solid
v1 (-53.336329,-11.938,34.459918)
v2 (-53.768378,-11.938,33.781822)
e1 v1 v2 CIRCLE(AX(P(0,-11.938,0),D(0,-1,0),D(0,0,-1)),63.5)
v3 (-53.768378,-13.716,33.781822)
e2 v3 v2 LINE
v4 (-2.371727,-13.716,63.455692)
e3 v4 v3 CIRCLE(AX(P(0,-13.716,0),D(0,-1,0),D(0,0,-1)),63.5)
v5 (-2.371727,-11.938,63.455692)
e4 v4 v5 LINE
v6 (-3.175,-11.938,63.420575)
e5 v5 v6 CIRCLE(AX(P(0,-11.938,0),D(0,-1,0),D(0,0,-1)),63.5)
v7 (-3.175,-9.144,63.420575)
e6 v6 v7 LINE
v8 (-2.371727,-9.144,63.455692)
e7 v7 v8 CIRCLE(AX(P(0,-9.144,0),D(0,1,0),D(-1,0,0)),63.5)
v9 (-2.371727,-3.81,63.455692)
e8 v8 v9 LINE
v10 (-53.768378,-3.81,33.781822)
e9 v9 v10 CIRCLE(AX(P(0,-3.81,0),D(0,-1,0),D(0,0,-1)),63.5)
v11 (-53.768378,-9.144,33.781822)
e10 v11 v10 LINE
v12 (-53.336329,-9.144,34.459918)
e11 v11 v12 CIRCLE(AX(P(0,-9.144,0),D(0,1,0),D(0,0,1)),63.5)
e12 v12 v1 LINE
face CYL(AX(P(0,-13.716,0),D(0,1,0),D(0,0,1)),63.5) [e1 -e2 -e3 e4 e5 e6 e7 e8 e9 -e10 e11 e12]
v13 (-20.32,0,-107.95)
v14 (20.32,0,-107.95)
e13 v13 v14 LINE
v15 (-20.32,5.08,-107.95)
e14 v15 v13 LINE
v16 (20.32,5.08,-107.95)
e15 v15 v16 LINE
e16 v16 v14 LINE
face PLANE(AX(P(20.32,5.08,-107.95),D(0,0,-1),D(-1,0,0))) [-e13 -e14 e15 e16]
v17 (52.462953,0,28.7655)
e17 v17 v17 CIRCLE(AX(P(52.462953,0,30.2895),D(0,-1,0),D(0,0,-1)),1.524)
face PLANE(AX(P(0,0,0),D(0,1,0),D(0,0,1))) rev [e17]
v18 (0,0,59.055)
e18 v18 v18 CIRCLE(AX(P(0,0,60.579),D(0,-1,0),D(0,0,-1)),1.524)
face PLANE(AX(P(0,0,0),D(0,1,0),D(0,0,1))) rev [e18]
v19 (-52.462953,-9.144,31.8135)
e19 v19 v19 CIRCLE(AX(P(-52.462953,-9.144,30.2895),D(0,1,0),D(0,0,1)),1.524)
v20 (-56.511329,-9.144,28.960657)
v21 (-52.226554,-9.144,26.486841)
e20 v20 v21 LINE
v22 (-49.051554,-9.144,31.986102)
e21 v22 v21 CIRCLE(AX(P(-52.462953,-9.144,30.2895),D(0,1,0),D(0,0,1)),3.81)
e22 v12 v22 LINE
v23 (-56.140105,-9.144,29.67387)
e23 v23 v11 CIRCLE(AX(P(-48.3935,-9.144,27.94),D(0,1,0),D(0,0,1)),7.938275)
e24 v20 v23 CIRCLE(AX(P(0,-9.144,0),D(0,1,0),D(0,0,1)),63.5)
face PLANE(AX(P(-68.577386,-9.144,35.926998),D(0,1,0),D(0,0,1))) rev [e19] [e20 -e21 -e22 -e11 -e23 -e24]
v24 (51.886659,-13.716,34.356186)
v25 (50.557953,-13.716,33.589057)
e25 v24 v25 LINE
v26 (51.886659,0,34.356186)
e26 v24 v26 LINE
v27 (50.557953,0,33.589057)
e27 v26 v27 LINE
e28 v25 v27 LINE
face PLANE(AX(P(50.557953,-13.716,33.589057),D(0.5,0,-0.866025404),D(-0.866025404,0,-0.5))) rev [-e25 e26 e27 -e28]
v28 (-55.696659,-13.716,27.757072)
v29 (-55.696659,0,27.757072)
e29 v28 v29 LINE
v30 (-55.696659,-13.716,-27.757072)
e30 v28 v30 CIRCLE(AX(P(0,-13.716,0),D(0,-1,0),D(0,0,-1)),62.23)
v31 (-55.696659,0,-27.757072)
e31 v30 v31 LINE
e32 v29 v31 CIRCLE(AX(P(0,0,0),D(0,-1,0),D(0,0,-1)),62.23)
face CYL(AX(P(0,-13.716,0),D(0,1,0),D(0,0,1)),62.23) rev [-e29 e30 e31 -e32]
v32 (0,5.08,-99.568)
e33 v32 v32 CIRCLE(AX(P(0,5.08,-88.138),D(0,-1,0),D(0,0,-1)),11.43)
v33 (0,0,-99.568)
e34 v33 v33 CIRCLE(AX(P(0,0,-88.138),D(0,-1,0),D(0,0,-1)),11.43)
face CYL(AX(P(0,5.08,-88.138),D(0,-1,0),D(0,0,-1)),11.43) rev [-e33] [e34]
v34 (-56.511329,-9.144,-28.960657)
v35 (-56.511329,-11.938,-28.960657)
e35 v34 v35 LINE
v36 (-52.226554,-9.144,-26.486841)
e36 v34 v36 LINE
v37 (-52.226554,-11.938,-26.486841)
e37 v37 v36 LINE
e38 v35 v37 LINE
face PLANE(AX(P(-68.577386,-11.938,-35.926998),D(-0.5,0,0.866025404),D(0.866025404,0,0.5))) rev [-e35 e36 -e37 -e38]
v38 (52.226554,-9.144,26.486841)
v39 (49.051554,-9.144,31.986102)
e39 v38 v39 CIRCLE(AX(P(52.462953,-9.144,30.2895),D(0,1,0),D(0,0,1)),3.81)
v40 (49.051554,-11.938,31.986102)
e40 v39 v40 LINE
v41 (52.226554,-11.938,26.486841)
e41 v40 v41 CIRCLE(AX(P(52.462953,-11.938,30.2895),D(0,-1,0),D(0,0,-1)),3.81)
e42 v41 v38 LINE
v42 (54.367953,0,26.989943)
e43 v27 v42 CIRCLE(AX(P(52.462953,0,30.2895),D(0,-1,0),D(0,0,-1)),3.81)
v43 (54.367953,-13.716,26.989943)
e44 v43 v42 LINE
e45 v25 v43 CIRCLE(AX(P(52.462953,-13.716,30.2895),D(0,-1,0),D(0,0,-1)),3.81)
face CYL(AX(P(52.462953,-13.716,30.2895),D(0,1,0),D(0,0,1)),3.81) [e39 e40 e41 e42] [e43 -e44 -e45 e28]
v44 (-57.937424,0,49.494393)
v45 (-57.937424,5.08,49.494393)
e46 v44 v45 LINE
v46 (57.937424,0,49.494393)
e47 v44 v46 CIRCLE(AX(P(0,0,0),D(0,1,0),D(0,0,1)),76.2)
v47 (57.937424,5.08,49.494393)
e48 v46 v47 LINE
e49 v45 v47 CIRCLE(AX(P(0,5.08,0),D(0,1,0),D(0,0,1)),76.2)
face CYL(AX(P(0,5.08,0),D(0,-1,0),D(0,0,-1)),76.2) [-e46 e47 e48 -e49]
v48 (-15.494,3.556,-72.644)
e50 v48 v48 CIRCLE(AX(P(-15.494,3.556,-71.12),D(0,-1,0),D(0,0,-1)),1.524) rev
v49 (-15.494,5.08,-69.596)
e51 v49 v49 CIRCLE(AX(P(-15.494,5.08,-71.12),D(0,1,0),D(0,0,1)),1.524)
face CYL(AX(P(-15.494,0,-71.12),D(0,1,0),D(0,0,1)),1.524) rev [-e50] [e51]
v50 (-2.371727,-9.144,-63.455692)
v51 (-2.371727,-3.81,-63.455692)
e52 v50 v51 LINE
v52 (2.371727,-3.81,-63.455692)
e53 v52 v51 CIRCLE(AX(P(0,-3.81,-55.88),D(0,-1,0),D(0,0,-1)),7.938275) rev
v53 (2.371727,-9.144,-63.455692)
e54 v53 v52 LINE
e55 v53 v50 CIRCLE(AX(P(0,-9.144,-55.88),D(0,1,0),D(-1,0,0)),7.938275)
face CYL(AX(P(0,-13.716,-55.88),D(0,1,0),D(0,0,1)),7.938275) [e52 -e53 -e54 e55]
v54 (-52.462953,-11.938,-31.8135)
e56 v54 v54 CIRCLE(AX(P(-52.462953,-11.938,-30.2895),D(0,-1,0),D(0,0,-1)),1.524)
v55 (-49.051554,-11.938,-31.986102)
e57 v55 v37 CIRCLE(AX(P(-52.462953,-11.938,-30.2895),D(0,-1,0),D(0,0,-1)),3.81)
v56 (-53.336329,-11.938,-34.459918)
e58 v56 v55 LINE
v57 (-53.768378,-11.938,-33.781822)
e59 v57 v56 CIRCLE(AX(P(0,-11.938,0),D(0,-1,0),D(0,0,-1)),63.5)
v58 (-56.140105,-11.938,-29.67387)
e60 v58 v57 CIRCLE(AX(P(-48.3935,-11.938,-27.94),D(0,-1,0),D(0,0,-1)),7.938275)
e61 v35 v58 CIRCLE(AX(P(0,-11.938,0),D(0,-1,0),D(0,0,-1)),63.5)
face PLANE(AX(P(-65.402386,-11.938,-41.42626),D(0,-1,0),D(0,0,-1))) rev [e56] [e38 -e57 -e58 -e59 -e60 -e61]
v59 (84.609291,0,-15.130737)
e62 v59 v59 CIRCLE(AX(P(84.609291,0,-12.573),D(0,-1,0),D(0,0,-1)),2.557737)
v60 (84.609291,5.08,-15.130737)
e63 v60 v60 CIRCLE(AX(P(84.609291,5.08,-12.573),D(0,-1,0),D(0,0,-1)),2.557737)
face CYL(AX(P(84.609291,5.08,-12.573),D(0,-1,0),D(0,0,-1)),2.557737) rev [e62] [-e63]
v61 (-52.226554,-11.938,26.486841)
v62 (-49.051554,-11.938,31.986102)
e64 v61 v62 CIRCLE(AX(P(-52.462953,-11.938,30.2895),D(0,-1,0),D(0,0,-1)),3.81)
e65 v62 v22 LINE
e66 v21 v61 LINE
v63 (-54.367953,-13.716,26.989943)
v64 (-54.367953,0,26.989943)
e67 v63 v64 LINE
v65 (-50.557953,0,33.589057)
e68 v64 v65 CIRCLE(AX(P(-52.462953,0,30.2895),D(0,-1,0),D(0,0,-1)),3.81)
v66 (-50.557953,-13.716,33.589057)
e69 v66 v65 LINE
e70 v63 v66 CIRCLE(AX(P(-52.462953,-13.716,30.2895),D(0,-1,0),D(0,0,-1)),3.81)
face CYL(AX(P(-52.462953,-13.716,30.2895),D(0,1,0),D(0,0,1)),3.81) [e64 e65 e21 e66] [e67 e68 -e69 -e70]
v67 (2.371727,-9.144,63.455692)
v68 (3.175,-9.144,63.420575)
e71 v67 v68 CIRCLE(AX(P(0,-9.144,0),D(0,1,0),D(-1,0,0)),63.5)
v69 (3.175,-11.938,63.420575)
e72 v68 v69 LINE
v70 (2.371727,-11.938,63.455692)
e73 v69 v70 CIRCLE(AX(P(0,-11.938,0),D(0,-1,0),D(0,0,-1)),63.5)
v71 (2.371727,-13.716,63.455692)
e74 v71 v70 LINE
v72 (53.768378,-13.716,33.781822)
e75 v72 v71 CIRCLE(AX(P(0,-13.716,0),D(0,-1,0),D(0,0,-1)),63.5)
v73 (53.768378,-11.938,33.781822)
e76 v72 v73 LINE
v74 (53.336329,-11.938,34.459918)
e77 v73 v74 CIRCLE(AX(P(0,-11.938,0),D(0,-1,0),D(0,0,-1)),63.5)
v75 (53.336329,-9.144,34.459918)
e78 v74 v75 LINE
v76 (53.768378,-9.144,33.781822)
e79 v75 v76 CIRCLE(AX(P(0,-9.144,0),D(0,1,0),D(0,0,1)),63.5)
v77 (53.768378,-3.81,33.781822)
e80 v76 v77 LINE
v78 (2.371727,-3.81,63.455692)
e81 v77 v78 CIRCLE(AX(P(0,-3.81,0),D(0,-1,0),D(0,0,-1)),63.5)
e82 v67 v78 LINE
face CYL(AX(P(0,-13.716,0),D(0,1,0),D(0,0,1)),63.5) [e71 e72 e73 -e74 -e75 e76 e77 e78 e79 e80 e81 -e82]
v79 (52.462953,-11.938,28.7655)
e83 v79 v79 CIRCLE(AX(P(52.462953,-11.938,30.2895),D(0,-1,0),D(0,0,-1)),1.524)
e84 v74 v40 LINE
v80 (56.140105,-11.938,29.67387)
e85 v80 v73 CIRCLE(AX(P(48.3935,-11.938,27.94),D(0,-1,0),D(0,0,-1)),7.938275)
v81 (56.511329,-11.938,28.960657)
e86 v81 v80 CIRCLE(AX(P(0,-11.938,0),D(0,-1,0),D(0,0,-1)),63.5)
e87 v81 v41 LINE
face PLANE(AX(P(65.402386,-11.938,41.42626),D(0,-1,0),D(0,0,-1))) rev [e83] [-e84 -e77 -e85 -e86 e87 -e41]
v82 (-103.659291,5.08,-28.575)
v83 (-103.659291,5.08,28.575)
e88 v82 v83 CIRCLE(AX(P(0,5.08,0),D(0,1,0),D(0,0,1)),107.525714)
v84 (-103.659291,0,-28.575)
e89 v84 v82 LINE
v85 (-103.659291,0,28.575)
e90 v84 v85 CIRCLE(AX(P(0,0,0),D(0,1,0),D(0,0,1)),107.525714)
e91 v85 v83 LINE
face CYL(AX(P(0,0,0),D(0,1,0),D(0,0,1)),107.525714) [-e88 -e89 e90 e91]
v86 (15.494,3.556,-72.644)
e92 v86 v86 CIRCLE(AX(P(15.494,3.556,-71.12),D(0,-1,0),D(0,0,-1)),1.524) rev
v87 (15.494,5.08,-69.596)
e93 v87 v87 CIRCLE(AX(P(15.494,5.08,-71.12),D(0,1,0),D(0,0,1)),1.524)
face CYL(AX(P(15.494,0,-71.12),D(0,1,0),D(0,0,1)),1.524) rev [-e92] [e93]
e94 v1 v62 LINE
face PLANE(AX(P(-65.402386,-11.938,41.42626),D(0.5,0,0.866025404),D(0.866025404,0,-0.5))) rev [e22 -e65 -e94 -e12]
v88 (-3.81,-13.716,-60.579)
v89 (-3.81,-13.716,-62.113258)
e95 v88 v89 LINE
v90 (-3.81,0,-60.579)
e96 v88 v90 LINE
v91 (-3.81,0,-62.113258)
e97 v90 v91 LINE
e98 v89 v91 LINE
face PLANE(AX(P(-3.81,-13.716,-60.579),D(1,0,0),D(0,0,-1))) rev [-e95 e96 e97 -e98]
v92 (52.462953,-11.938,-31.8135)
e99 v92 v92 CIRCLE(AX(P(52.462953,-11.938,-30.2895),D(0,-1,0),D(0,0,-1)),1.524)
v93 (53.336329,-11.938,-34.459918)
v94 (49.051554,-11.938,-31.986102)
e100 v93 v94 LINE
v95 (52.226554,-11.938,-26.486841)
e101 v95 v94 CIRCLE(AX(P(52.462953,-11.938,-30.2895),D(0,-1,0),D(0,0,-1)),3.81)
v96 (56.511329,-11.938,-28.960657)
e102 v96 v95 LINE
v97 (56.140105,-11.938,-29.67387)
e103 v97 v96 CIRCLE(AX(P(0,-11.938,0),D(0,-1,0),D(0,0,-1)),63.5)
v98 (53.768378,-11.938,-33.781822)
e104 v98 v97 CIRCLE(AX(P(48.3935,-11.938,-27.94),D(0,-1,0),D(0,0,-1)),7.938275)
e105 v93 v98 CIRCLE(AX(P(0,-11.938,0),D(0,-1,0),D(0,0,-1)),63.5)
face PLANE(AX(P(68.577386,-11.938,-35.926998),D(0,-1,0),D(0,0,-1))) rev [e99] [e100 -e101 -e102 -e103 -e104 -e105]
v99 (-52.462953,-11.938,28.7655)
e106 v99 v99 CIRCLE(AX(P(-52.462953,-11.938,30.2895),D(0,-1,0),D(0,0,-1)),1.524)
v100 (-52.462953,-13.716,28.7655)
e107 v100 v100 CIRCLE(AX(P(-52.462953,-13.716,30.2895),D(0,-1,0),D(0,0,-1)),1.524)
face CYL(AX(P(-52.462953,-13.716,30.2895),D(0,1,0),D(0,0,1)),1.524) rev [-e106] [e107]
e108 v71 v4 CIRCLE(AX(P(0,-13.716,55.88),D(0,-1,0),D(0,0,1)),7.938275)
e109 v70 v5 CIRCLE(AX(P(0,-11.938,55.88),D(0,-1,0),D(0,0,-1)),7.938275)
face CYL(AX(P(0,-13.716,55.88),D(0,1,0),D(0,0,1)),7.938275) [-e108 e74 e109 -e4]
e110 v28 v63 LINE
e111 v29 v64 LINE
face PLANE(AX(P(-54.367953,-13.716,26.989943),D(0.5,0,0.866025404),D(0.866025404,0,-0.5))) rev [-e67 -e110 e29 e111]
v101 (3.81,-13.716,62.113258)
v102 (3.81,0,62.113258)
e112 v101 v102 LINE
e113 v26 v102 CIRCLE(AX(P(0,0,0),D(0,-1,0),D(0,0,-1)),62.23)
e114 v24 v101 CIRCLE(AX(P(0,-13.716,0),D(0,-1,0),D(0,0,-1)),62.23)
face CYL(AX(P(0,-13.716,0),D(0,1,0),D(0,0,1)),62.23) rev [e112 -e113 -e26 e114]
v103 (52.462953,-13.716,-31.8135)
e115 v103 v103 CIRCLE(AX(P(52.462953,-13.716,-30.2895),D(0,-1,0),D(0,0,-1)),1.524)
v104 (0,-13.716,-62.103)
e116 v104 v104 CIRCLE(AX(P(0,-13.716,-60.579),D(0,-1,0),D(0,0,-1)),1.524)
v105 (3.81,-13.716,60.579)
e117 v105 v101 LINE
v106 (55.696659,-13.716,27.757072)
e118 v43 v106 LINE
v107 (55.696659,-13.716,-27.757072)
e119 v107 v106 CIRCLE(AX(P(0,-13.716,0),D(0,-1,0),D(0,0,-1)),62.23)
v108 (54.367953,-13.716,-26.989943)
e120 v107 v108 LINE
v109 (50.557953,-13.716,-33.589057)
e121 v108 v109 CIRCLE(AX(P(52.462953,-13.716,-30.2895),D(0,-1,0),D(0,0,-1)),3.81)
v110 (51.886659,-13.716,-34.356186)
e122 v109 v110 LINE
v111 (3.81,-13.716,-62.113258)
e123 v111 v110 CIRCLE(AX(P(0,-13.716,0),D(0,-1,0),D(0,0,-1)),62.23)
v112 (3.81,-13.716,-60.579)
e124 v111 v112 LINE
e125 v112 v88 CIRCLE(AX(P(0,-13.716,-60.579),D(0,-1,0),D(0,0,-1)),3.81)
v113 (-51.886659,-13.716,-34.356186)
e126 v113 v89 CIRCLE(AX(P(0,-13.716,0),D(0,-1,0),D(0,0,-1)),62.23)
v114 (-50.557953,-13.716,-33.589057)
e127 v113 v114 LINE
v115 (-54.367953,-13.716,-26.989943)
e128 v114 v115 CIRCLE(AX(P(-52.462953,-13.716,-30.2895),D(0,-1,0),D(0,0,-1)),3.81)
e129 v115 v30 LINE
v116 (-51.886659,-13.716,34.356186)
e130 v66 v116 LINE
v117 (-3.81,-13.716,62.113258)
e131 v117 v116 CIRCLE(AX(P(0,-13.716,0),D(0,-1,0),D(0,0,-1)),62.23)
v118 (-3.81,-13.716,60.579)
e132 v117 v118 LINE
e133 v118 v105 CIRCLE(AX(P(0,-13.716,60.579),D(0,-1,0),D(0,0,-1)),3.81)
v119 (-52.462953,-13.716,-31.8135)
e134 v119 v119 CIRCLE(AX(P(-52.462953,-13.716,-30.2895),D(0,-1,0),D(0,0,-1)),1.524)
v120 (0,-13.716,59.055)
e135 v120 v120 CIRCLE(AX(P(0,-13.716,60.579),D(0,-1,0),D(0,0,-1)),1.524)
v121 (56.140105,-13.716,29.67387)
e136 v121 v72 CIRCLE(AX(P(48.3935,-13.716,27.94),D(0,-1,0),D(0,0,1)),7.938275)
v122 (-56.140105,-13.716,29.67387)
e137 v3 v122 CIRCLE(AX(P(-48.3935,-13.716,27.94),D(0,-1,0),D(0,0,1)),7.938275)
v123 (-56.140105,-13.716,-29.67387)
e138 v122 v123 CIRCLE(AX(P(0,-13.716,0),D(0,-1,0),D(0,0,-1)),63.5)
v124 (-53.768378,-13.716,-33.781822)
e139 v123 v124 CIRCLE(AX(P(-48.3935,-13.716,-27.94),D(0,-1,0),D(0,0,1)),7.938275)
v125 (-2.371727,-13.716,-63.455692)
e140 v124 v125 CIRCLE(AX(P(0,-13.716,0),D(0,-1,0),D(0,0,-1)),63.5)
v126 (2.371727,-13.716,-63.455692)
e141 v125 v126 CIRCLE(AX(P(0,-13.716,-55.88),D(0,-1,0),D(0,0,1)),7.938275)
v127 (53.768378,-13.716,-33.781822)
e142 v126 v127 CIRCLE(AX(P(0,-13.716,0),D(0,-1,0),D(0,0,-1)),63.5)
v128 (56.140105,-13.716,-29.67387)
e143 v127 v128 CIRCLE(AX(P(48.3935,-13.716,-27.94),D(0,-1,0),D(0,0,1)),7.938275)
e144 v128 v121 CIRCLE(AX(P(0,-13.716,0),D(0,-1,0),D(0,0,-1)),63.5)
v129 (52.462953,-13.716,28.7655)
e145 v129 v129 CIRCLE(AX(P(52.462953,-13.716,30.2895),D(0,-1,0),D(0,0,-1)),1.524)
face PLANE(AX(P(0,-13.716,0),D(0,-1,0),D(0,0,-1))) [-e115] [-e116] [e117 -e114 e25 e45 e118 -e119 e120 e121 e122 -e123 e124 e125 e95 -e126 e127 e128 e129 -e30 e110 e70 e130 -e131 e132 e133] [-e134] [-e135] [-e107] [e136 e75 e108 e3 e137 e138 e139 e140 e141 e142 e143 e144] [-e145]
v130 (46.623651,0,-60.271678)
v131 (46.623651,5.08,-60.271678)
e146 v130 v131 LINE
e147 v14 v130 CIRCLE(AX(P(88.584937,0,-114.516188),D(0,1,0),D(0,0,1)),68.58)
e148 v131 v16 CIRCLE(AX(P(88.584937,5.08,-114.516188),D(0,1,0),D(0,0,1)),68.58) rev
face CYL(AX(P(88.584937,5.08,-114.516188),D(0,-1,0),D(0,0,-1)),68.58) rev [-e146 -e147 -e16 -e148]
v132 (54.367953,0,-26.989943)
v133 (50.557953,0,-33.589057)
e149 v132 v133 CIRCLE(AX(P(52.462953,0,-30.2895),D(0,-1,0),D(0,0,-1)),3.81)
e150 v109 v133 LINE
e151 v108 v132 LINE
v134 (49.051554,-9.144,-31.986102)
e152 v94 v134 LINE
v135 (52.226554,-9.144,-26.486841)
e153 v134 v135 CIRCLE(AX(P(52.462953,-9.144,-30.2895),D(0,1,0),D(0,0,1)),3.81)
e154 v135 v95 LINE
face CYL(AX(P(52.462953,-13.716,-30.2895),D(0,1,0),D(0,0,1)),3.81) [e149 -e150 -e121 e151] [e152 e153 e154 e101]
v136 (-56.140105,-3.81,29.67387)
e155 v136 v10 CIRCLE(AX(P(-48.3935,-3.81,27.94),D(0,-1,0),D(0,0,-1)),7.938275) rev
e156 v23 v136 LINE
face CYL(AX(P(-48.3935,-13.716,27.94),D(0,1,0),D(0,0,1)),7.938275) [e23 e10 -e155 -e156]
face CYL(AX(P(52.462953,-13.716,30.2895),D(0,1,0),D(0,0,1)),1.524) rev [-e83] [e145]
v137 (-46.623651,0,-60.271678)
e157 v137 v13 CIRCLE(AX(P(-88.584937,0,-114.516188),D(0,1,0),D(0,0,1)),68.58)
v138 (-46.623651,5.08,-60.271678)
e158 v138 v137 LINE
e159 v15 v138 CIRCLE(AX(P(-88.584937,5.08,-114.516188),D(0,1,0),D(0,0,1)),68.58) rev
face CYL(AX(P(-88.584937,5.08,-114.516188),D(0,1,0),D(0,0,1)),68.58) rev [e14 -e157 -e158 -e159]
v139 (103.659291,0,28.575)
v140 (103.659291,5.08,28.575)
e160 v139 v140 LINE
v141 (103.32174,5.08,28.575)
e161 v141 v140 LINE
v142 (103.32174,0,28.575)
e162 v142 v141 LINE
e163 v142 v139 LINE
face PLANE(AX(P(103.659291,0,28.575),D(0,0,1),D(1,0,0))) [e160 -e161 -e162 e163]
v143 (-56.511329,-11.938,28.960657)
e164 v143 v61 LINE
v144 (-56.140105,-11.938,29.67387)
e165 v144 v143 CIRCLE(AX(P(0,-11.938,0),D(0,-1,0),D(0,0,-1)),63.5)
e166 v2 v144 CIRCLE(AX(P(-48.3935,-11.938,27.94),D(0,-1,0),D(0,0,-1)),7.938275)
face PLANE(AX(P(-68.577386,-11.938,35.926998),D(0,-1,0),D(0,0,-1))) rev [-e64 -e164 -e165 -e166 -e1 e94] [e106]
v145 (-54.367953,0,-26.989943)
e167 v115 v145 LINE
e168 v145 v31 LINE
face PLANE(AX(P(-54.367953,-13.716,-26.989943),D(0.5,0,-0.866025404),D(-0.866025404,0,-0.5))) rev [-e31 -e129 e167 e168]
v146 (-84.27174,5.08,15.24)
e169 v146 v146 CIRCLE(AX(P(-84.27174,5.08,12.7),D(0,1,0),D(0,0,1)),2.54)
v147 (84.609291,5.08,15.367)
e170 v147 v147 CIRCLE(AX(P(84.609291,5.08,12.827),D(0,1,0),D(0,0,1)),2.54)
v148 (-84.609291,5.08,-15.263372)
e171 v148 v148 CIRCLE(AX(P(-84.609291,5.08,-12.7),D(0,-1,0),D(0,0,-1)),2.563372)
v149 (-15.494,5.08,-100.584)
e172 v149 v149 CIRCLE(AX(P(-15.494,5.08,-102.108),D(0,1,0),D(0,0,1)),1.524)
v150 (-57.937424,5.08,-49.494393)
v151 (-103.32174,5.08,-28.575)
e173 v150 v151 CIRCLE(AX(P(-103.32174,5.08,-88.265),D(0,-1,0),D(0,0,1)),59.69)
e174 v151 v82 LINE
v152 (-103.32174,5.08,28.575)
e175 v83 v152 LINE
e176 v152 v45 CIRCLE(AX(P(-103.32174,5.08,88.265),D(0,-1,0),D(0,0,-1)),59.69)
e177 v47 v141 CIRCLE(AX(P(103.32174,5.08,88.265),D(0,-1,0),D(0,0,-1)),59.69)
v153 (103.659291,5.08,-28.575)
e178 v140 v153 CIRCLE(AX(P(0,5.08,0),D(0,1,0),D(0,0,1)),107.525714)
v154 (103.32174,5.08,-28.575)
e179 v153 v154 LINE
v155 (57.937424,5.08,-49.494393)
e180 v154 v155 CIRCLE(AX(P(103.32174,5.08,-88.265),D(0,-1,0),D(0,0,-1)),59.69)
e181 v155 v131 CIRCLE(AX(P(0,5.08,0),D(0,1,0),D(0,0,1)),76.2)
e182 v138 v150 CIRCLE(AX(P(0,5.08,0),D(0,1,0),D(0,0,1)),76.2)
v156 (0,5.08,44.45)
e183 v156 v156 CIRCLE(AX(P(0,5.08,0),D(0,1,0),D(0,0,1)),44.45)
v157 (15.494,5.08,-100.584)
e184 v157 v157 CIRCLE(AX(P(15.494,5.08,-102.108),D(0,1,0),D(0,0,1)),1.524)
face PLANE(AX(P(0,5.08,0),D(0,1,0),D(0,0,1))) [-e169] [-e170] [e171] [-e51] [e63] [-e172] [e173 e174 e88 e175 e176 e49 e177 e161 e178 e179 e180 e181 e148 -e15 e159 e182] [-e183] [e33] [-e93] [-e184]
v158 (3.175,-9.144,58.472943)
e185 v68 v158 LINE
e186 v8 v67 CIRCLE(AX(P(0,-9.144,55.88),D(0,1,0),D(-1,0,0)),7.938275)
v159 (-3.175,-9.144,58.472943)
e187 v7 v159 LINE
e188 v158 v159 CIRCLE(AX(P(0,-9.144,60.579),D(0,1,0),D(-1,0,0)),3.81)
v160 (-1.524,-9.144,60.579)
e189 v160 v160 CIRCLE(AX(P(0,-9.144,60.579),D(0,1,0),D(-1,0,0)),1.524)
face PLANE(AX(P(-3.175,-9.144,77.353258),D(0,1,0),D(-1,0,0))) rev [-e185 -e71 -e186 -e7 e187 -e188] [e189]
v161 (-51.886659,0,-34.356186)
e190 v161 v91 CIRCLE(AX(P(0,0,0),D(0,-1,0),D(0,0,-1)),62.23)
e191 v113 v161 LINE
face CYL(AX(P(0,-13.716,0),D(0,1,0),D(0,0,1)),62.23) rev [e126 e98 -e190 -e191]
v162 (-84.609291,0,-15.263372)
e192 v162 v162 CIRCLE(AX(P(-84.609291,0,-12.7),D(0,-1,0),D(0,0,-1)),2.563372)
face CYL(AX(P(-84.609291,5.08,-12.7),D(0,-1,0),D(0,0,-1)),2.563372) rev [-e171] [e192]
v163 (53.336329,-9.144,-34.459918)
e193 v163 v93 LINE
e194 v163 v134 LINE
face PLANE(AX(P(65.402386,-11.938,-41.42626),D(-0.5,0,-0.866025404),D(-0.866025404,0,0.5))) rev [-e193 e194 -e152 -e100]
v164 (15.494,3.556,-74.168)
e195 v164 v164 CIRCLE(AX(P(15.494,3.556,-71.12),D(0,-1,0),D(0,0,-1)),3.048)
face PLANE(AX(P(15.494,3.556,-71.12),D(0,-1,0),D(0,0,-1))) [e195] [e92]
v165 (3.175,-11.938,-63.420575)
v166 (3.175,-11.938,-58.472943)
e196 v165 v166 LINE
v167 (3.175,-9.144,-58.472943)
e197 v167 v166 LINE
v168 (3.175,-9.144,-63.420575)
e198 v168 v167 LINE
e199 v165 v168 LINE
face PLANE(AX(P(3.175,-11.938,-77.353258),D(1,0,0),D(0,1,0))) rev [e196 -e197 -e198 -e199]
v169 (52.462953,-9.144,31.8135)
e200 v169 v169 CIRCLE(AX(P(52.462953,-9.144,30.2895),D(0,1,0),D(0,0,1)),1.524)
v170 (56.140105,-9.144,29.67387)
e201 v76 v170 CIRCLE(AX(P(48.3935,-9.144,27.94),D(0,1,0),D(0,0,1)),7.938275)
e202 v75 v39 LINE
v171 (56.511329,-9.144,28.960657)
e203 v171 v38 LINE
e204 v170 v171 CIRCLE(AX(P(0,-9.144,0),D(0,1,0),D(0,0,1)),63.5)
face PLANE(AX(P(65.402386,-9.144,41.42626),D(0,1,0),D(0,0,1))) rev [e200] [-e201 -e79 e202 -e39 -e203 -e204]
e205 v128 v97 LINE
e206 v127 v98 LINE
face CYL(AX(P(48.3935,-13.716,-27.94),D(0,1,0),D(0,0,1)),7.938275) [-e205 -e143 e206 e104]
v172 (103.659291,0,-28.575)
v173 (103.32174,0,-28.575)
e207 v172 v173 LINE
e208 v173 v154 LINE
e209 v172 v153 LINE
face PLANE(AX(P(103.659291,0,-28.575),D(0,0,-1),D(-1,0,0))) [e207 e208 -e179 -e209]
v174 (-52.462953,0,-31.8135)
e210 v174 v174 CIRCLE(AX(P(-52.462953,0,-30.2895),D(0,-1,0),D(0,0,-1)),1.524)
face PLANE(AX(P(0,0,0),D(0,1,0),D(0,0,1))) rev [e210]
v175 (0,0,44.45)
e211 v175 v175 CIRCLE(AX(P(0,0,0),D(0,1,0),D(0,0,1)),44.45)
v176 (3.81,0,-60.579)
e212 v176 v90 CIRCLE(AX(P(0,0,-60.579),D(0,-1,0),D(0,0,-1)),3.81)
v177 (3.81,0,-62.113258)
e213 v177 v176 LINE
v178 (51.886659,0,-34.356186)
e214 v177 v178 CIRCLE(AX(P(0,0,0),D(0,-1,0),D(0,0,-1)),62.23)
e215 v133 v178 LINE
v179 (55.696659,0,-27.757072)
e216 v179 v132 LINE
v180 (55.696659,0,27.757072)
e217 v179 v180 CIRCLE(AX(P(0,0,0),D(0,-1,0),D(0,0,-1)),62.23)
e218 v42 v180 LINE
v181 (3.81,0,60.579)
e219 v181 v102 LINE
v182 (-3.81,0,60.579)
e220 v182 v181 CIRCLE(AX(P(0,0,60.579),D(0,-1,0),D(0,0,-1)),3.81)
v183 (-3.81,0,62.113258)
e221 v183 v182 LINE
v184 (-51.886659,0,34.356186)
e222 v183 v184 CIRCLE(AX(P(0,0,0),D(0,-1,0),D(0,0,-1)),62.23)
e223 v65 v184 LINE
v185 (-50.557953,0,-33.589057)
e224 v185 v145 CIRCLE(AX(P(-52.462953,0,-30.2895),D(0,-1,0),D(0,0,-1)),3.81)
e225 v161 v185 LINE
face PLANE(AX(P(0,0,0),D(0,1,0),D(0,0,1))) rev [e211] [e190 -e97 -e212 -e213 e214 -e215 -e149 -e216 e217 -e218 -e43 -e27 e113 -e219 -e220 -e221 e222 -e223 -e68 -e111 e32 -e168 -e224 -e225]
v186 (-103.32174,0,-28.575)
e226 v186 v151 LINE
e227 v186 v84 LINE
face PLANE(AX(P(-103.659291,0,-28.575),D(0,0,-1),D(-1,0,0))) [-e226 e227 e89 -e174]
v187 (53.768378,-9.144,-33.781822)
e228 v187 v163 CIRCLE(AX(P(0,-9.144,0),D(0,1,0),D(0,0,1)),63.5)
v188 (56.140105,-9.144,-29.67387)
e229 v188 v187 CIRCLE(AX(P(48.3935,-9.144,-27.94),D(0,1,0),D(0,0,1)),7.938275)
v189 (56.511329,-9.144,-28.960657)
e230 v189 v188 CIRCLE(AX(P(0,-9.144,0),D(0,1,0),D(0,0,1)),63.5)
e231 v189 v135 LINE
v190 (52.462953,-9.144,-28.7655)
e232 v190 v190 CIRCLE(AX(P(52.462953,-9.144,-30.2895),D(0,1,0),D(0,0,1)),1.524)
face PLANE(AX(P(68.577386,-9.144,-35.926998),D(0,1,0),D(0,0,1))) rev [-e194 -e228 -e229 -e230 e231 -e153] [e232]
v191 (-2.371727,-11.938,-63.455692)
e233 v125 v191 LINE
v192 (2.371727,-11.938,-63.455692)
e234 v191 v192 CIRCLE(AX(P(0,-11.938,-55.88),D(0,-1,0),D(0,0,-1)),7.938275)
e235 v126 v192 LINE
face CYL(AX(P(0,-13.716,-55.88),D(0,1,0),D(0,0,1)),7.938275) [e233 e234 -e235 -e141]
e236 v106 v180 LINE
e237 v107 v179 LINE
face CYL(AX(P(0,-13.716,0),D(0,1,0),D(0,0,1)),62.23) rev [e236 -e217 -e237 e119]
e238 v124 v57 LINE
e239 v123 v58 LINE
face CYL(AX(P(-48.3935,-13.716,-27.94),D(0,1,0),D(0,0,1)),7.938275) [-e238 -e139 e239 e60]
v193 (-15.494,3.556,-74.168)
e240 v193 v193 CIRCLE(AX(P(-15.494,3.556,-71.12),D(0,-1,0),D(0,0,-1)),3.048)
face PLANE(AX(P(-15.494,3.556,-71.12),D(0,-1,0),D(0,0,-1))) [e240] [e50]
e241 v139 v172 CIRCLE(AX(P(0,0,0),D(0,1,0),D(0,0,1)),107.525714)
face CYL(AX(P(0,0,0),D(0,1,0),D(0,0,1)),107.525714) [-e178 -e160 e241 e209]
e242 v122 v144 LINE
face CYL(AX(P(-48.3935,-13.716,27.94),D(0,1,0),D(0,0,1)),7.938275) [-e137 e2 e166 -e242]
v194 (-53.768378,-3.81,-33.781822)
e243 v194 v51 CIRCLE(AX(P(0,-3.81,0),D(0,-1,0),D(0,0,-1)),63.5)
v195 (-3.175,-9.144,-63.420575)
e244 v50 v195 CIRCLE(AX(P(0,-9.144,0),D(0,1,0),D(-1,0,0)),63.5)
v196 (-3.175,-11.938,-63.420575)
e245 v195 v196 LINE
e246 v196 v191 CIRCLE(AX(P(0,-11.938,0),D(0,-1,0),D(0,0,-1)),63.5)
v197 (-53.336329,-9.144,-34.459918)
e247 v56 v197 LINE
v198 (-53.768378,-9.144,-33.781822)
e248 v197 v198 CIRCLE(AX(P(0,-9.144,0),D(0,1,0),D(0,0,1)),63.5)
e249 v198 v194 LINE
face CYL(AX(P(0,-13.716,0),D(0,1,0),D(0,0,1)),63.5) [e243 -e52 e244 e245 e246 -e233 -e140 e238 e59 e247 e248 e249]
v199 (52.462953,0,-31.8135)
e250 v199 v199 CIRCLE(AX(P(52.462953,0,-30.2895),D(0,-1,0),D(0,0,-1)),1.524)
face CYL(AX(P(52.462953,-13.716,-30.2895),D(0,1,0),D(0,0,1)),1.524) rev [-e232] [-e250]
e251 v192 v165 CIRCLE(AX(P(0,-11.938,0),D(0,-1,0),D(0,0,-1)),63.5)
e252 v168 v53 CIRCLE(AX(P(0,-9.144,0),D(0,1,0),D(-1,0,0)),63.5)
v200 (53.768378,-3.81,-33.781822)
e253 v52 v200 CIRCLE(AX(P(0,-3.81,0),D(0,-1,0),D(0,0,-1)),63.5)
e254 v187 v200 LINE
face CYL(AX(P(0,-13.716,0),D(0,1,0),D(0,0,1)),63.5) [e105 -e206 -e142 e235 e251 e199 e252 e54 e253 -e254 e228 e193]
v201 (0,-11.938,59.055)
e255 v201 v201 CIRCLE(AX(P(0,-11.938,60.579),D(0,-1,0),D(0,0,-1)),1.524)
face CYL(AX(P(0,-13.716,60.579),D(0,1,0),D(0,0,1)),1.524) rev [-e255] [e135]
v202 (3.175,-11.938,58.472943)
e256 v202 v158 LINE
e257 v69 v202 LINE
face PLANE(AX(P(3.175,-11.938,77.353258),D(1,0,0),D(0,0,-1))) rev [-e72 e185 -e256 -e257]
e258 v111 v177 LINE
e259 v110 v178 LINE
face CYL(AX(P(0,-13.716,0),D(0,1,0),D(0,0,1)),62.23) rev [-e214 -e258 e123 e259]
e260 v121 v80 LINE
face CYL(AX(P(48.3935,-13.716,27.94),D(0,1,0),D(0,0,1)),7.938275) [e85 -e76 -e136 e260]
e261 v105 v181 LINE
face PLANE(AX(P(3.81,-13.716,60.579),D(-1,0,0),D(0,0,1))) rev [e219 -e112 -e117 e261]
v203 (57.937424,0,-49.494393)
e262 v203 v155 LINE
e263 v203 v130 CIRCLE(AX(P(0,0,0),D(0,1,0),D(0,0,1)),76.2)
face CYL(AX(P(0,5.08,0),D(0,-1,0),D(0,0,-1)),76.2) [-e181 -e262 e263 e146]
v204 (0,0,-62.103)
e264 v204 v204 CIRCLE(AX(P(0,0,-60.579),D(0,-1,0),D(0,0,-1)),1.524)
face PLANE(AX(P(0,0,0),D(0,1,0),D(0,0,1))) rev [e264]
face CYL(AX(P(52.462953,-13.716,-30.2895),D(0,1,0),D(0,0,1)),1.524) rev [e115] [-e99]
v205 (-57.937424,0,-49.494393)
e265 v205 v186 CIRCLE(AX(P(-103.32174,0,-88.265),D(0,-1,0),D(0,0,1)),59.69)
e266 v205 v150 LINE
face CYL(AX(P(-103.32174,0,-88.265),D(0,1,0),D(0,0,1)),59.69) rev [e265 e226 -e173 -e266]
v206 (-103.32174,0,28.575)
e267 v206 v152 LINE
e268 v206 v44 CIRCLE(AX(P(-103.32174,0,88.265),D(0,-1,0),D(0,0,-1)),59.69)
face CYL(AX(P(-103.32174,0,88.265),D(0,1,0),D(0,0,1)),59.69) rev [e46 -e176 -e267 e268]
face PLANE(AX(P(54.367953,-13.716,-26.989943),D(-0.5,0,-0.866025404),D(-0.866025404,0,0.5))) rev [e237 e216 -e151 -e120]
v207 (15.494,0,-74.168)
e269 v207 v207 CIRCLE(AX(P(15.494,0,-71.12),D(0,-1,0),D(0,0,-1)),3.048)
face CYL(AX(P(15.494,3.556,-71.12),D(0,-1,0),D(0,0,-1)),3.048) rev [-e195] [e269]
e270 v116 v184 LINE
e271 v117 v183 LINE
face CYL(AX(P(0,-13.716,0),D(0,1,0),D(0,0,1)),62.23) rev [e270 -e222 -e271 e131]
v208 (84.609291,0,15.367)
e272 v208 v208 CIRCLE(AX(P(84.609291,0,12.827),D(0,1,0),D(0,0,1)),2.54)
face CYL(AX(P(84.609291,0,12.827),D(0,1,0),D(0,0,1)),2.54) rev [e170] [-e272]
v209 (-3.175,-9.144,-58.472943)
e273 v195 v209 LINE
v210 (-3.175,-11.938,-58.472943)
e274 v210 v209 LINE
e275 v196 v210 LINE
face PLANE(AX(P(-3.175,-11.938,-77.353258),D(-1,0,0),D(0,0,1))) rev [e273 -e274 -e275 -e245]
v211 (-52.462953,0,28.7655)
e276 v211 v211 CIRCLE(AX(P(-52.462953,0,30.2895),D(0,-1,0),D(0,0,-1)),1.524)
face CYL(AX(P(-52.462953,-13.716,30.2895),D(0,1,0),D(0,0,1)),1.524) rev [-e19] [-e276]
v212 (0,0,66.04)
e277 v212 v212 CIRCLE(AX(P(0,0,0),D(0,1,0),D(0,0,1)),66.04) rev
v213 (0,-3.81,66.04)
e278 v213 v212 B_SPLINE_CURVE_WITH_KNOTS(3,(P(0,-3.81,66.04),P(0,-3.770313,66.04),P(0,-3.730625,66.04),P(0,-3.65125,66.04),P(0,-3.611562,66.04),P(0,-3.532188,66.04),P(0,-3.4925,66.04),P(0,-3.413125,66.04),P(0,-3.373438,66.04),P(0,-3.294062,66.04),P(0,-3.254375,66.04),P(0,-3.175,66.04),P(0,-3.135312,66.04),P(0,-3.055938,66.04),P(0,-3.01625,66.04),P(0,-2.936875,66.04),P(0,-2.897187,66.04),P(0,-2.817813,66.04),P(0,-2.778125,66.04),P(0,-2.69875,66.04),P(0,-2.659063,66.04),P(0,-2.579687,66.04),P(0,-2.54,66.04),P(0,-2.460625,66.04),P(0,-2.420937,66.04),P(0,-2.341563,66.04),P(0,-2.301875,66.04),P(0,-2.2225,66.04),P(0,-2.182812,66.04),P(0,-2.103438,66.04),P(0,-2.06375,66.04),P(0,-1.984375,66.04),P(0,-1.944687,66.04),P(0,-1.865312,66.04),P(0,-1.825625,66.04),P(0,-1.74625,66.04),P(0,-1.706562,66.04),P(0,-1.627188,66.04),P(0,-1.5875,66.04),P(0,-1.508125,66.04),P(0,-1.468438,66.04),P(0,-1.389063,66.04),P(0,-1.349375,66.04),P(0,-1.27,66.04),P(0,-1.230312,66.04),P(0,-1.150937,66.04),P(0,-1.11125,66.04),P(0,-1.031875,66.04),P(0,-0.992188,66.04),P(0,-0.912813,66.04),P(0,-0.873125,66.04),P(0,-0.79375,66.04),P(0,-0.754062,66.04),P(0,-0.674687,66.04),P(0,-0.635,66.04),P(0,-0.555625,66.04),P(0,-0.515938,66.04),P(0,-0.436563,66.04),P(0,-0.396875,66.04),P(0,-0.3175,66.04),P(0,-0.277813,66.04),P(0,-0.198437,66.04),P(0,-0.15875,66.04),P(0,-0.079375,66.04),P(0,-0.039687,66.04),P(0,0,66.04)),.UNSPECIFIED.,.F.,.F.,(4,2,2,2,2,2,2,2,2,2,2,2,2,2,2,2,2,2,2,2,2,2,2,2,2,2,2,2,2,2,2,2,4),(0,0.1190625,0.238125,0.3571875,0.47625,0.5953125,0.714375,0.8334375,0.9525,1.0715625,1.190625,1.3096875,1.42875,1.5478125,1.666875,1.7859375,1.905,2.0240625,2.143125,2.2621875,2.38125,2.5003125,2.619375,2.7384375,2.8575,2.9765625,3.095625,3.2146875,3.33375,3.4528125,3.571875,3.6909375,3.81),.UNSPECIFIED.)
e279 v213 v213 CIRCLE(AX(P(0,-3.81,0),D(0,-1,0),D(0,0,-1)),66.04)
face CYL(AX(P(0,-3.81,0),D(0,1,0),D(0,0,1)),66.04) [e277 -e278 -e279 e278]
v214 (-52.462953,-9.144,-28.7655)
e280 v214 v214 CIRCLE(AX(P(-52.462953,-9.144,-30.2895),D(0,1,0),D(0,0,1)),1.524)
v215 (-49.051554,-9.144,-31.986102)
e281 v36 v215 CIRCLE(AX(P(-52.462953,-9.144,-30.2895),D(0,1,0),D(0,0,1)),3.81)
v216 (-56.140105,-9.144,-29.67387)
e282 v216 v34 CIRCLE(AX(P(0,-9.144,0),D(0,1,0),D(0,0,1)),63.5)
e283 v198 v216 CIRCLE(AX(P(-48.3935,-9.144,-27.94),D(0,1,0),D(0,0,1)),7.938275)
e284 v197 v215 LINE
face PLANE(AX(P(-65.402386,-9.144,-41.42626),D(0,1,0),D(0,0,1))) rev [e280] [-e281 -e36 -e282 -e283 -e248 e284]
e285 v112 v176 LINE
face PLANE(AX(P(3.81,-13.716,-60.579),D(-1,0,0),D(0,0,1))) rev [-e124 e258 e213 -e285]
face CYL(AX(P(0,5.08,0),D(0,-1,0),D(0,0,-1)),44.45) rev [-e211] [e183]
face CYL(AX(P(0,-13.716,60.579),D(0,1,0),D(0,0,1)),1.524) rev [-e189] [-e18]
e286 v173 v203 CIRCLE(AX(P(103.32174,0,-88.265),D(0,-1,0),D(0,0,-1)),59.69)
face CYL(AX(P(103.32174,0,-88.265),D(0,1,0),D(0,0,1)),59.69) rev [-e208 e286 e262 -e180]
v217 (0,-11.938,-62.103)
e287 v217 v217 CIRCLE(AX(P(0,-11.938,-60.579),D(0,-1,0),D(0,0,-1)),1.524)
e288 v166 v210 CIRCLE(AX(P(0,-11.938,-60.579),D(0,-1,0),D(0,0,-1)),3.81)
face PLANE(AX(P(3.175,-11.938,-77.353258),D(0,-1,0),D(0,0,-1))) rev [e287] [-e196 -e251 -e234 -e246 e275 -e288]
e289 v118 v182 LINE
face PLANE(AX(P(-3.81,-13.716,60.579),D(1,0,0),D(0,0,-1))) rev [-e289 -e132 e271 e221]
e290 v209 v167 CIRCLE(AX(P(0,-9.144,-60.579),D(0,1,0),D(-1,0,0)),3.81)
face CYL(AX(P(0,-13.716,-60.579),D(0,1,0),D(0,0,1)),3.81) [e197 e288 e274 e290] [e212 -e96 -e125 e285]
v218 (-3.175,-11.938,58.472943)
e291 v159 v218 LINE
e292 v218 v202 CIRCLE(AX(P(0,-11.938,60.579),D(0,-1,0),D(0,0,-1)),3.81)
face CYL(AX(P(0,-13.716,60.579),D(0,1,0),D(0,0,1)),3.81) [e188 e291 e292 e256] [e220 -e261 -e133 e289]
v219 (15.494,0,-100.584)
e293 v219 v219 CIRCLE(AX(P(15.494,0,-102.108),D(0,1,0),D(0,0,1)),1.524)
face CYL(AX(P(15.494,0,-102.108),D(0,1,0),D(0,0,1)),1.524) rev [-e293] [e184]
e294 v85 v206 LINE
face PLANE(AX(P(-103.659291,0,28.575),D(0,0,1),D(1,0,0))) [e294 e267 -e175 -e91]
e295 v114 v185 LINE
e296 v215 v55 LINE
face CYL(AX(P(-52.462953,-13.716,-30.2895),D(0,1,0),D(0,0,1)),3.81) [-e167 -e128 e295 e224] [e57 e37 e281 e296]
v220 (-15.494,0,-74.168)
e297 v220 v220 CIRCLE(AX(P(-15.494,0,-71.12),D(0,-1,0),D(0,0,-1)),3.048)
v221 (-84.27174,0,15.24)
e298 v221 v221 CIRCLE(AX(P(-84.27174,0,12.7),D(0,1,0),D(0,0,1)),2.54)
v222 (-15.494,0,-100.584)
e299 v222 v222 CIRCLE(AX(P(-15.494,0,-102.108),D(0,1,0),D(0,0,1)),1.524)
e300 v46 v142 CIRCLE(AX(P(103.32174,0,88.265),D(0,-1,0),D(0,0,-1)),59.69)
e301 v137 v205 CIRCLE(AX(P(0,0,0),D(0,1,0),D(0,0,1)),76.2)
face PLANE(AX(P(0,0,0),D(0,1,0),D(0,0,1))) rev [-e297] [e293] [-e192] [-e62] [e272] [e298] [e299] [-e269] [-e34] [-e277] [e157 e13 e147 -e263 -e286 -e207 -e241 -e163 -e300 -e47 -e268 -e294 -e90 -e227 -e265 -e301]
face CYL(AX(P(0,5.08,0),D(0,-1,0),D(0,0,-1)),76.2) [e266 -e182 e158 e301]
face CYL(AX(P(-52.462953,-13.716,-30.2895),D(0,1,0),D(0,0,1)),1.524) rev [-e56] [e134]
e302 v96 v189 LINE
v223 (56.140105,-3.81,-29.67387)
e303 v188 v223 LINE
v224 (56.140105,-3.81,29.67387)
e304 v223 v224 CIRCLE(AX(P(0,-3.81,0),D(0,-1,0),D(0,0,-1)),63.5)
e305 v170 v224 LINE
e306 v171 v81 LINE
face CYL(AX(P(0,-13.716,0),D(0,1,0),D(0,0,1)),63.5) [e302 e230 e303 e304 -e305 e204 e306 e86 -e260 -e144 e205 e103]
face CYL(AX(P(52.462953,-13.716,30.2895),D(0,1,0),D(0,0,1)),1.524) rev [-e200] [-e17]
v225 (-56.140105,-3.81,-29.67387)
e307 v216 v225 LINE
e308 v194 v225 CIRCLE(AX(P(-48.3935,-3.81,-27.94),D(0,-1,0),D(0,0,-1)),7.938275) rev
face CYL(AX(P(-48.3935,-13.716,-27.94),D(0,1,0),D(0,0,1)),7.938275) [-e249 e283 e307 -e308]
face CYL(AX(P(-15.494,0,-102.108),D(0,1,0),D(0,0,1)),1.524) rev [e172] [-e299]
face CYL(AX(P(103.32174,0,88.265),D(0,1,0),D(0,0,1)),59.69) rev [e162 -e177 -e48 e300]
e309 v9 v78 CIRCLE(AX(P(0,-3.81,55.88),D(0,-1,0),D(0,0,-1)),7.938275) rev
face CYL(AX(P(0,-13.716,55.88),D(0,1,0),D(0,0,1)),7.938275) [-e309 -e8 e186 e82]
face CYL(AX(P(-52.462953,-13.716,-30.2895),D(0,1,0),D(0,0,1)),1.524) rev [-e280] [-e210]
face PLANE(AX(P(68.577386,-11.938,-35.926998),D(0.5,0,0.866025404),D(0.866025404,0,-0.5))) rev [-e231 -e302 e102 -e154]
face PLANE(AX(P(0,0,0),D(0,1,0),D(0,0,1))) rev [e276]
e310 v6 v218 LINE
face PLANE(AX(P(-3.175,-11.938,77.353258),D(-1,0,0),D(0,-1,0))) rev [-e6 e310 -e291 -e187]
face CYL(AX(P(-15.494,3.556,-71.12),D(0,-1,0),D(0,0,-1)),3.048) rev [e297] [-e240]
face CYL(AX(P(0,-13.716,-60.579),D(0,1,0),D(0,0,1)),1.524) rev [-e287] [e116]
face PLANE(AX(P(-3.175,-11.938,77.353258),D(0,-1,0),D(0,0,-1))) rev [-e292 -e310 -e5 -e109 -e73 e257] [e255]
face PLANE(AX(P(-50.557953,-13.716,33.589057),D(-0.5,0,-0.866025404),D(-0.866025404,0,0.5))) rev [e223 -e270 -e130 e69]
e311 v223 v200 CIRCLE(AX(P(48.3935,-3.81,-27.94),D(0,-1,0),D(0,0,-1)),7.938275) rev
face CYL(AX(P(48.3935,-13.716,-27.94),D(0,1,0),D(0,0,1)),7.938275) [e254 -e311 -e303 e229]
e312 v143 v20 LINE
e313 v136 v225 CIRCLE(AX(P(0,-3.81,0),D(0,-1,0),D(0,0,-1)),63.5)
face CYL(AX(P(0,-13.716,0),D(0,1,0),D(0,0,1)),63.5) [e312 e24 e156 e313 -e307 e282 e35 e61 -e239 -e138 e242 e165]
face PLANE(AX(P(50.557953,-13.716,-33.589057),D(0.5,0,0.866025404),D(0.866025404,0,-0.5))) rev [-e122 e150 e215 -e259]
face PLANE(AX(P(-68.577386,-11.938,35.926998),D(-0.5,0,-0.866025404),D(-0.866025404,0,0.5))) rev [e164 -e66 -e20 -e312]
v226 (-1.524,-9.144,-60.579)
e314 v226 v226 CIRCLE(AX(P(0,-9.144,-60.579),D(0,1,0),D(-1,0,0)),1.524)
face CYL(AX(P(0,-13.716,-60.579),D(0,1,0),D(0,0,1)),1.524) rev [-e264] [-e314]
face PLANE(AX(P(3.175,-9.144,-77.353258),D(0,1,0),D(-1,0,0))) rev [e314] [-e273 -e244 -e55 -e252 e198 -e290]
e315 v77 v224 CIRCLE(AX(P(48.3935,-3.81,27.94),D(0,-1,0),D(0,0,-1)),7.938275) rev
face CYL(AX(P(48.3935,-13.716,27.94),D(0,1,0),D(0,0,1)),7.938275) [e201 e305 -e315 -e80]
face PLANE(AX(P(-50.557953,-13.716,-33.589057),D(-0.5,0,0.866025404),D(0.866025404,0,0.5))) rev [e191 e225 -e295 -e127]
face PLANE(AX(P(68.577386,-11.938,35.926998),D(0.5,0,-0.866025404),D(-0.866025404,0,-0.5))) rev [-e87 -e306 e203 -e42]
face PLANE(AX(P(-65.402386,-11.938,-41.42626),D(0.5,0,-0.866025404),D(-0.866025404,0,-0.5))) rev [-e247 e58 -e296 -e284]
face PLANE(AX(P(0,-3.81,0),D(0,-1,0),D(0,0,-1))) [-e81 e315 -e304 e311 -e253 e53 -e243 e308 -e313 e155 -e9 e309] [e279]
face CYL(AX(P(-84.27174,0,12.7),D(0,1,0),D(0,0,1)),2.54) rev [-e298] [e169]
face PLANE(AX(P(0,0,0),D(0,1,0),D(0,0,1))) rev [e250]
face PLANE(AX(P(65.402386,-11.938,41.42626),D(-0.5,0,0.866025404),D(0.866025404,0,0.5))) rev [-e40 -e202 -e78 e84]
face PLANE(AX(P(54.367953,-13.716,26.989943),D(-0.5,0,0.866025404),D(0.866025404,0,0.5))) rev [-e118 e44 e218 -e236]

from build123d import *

# Parameters (mm, degrees)
SKETCH1_R            = 76.2
SKETCH1_R_2          = 44.45
BOSS_EXTRUDE1_DEPTH  = 5.08
BOSS_EXTRUDE12_DEPTH = 5.08
SKETCH7_R            = 44.45
BOSS_EXTRUDE13_DEPTH = 5.08
SKETCH8_R            = 2.54
CUT_EXTRUDE1_DEPTH   = 132.886411546
SKETCH11_R           = 2.55773741
SKETCH11_R_2         = 2.443934978
SKETCH11_R_3         = 2.44571327
SKETCH11_R_4         = 2.563372012
CUT_EXTRUDE2_DEPTH   = 132.886411546
SKETCH12_R           = 63.5
SKETCH12_R_2         = 62.23
BOSS_EXTRUDE15_DEPTH = 13.716
SKETCH13_R           = 66.04
SKETCH13_R_2         = 63.5
BOSS_EXTRUDE16_DEPTH = 3.81
SKETCH14_W           = 40.64
SKETCH14_H           = 43.18
SKETCH14_R           = 11.43
BOSS_EXTRUDE17_DEPTH = 5.08
CUT_EXTRUDE3_START   = -5.08
SKETCH15_R           = 11.43
SKETCH15_R_2         = 1.524
CUT_EXTRUDE3_DEPTH   = 5.08
BOSS_EXTRUDE19_DEPTH = 13.716
SKETCH18_R           = 1.524
BOSS_EXTRUDE20_DEPTH = 13.716
SKETCH19_W           = 6.35
SKETCH19_H           = 2.794
CUT_EXTRUDE4_DEPTH   = 15.24
CIRPATTERN1_COUNT    = 6
SKETCH21_R           = 3.048
CUT_EXTRUDE6_DEPTH   = 3.556
FILLET2_R            = 68.58


with BuildPart() as part:
    # Sketch1 → Boss-Extrude1 (new body)
    with BuildSketch(Plane(origin=(0, 0, 0), x_dir=(1, 0, 0), z_dir=(0, 1, 0))):
        with Locations(Location((0, 0, 0), (0, 0, 270))):
            Circle(SKETCH1_R)
        with Locations(Location((0, 0, 0), (0, 0, 270))):
            Circle(SKETCH1_R_2, mode=Mode.SUBTRACT)
    extrude(amount=BOSS_EXTRUDE1_DEPTH)

    # Sketch6 → Boss-Extrude12 (add, through all)
    with BuildSketch(Plane(origin=(0, 5.08, 0), x_dir=(1, 0, 0), z_dir=(0, 1, 0))):
        with BuildLine():
            Line((-103.65929059, 28.575), (-70.63929059, 28.575))
            ThreePointArc((-70.63929059, 28.575), (-76.2, 0), (-70.63929059, -28.575))
            Line((-70.63929059, -28.575), (-103.65929059, -28.575))
            ThreePointArc((-103.65929059, -28.575), (-107.525713904, 0), (-103.65929059, 28.575))
        make_face()
        with BuildLine():
            Line((103.65929059, -28.575), (70.63929059, -28.575))
            ThreePointArc((70.63929059, -28.575), (76.2, 0), (70.63929059, 28.575))
            Line((70.63929059, 28.575), (103.65929059, 28.575))
            ThreePointArc((103.65929059, 28.575), (107.525713904, 0), (103.65929059, -28.575))
        make_face()
    extrude(amount=-BOSS_EXTRUDE12_DEPTH)

    # Sketch7 → Boss-Extrude13 (add, through all)
    with BuildSketch(Plane(origin=(0, 5.08, 0), x_dir=(1, 0, 0), z_dir=(0, 1, 0))):
        with BuildLine():
            Line((-103.65929059, 28.575), (-103.321739605, 28.575))
            ThreePointArc((-103.321739605, 28.575), (-78.334957702, 34.056542817), (-57.937424078, 49.494392523))
            ThreePointArc((-57.937424078, 49.494392523), (0, 76.2), (57.937424078, 49.494392523))
            ThreePointArc((57.937424078, 49.494392523), (78.334957702, 34.056542817), (103.321739605, 28.575))
            Line((103.321739605, 28.575), (103.65929059, 28.575))
            Line((103.65929059, 28.575), (103.65929059, -28.575))
            Line((103.65929059, -28.575), (103.321739605, -28.575))
            ThreePointArc((103.321739605, -28.575), (78.334957702, -34.056542817), (57.937424078, -49.494392523))
            ThreePointArc((57.937424078, -49.494392523), (0, -76.2), (-57.937424078, -49.494392523))
            ThreePointArc((-57.937424078, -49.494392523), (-78.334957702, -34.056542817), (-103.321739605, -28.575))
            Line((-103.321739605, -28.575), (-103.65929059, -28.575))
            Line((-103.65929059, -28.575), (-103.65929059, 28.575))
        make_face()
        with Locations(Location((0, 0, 0), (0, 0, 270))):
            Circle(SKETCH7_R, mode=Mode.SUBTRACT)
    extrude(amount=-BOSS_EXTRUDE13_DEPTH)

    # Sketch8 → Cut-Extrude1 (cut, through all)
    with BuildSketch(Plane(origin=(0, 5.08, 0), x_dir=(1, 0, 0), z_dir=(0, 1, 0))):
        with Locations(Location((-84.60929059, 12.7, 0), (0, 0, 270))):
            Circle(SKETCH8_R)
        with Locations(Location((-84.271739605, -12.7, 0), (0, 0, 270))):
            Circle(SKETCH8_R)
        with Locations(Location((84.60929059, 12.573, 0), (0, 0, 270))):
            Circle(SKETCH8_R)
        with Locations(Location((84.60929059, -12.827, 0), (0, 0, 270))):
            Circle(SKETCH8_R)
    extrude(amount=-CUT_EXTRUDE1_DEPTH, mode=Mode.SUBTRACT)

    # Sketch11 → Cut-Extrude2 (cut, through all)
    with BuildSketch(Plane.XZ):
        with Locations(Location((84.60929059, -12.573, 0), (0, 0, 270))):
            Circle(SKETCH11_R)
        with Locations((84.60929059, 12.827)):
            Circle(SKETCH11_R_2)
        with Locations((-84.271739605, 12.7)):
            Circle(SKETCH11_R_3)
        with Locations(Location((-84.60929059, -12.7, 0), (0, 0, 270))):
            Circle(SKETCH11_R_4)
    extrude(amount=-CUT_EXTRUDE2_DEPTH, mode=Mode.SUBTRACT)

    # Sketch12 → Boss-Extrude15 (add)
    with BuildSketch(Plane.XZ):
        with Locations(Location((0, 0, 0), (0, 0, 90))):
            Circle(SKETCH12_R)
        with Locations(Location((0, 0, 0), (0, 0, 270))):
            Circle(SKETCH12_R_2, mode=Mode.SUBTRACT)
    extrude(amount=BOSS_EXTRUDE15_DEPTH)

    # Sketch13 → Boss-Extrude16 (add)
    with BuildSketch(Plane.XZ):
        with Locations(Location((0, 0, 0), (0, 0, 90))):
            Circle(SKETCH13_R)
        with Locations(Location((0, 0, 0), (0, 0, 270))):
            Circle(SKETCH13_R_2, mode=Mode.SUBTRACT)
    extrude(amount=BOSS_EXTRUDE16_DEPTH)

    # Sketch14 → Boss-Extrude17 (add)
    with BuildSketch(Plane.XZ):
        with Locations((0, -86.36)):
            Rectangle(SKETCH14_W, SKETCH14_H)
        with Locations(Location((0, -88.138, 0), (0, 0, 270))):
            Circle(SKETCH14_R, mode=Mode.SUBTRACT)
    extrude(amount=-BOSS_EXTRUDE17_DEPTH)

    # Sketch15 → Cut-Extrude3 (cut)
    with BuildSketch(Plane(origin=(0, 5.08, 0), x_dir=(1, 0, 0), z_dir=(0, 1, 0)).offset(CUT_EXTRUDE3_START)):
        with Locations(Location((0, 88.138, 0), (0, 0, 90))):
            Circle(SKETCH15_R)
        with Locations(Location((-15.494, 102.108, 0), (0, 0, 270))):
            Circle(SKETCH15_R_2)
        with Locations(Location((15.494, 102.108, 0), (0, 0, 270))):
            Circle(SKETCH15_R_2)
        with Locations(Location((15.494, 71.12, 0), (0, 0, 270))):
            Circle(SKETCH15_R_2)
        with Locations(Location((-15.494, 71.12, 0), (0, 0, 270))):
            Circle(SKETCH15_R_2)
    extrude(amount=CUT_EXTRUDE3_DEPTH, mode=Mode.SUBTRACT)

    # Sketch17 → Boss-Extrude19 (add, through all)
    with BuildSketch(Plane.XZ):
        with BuildLine():
            ThreePointArc((53.768378144, -33.781822209), (54.99261314, -31.75), (56.140105291, -29.673870289))
            ThreePointArc((56.140105291, -29.673870289), (55.268247185, -31.90913739), (53.768378144, -33.781822209))
        make_face()
        with BuildLine():
            ThreePointArc((2.371727147, -63.455692498), (0, -63.81827478), (-2.371727147, -63.455692498))
            ThreePointArc((-2.371727147, -63.455692498), (0, -63.5), (2.371727147, -63.455692498))
        make_face()
        with BuildLine():
            ThreePointArc((-53.768378144, -33.781822209), (-55.268247185, -31.90913739), (-56.140105291, -29.673870289))
            ThreePointArc((-56.140105291, -29.673870289), (-54.99261314, -31.75), (-53.768378144, -33.781822209))
        make_face()
        with BuildLine():
            ThreePointArc((-56.140105291, 29.673870289), (-55.268247185, 31.90913739), (-53.768378144, 33.781822209))
            ThreePointArc((-53.768378144, 33.781822209), (-54.99261314, 31.75), (-56.140105291, 29.673870289))
        make_face()
        with BuildLine():
            ThreePointArc((-2.371727147, 63.455692498), (0, 63.81827478), (2.371727147, 63.455692498))
            ThreePointArc((2.371727147, 63.455692498), (0, 63.5), (-2.371727147, 63.455692498))
        make_face()
        with BuildLine():
            ThreePointArc((53.768378144, 33.781822209), (55.268247185, 31.90913739), (56.140105291, 29.673870289))
            ThreePointArc((56.140105291, 29.673870289), (54.99261314, 31.75), (53.768378144, 33.781822209))
        make_face()
    extrude(amount=BOSS_EXTRUDE19_DEPTH)

    # Sketch18 → Boss-Extrude20 (add, through all)
    # profile 1 of 6: a face of its own
    with BuildSketch(Plane.XZ):
        with BuildLine():
            Line((-3.81, -60.579), (-3.81, -62.113257844))
            ThreePointArc((-3.81, -62.113257844), (0, -62.23), (3.81, -62.113257844))
            Line((3.81, -62.113257844), (3.81, -60.579))
            ThreePointArc((3.81, -60.579), (0, -56.769), (-3.81, -60.579))
        make_face()
        with Locations(Location((0, -60.579, 0), (0, 0, 270))):
            Circle(SKETCH18_R, mode=Mode.SUBTRACT)
    # profile 2 of 6: a face of its own
    with BuildSketch(Plane.XZ):
        with BuildLine():
            Line((-54.367952936, -26.989943212), (-55.696659205, -27.757072134))
            ThreePointArc((-55.696659205, -27.757072134), (-53.892760878, -31.115), (-51.886659205, -34.35618571))
            Line((-51.886659205, -34.35618571), (-50.557952936, -33.589056788))
            ThreePointArc((-50.557952936, -33.589056788), (-49.163396147, -28.3845), (-54.367952936, -26.989943212))
        make_face()
        with Locations(Location((-52.462952936, -30.2895, 0), (0, 0, 270))):
            Circle(SKETCH18_R, mode=Mode.SUBTRACT)
    # profile 3 of 6: a face of its own
    with BuildSketch(Plane.XZ):
        with BuildLine():
            Line((-50.557952936, 33.589056788), (-51.886659205, 34.35618571))
            ThreePointArc((-51.886659205, 34.35618571), (-53.892760878, 31.115), (-55.696659205, 27.757072134))
            Line((-55.696659205, 27.757072134), (-54.367952936, 26.989943212))
            ThreePointArc((-54.367952936, 26.989943212), (-49.163396147, 28.3845), (-50.557952936, 33.589056788))
        make_face()
        with Locations(Location((-52.462952936, 30.2895, 0), (0, 0, 270))):
            Circle(SKETCH18_R, mode=Mode.SUBTRACT)
    # profile 4 of 6: a face of its own
    with BuildSketch(Plane.XZ):
        with BuildLine():
            Line((3.81, 60.579), (3.81, 62.113257844))
            ThreePointArc((3.81, 62.113257844), (0, 62.23), (-3.81, 62.113257844))
            Line((-3.81, 62.113257844), (-3.81, 60.579))
            ThreePointArc((-3.81, 60.579), (0, 56.769), (3.81, 60.579))
        make_face()
        with Locations(Location((0, 60.579, 0), (0, 0, 270))):
            Circle(SKETCH18_R, mode=Mode.SUBTRACT)
    # profile 5 of 6: a face of its own
    with BuildSketch(Plane.XZ):
        with BuildLine():
            Line((54.367952936, 26.989943212), (55.696659205, 27.757072134))
            ThreePointArc((55.696659205, 27.757072134), (53.892760878, 31.115), (51.886659205, 34.35618571))
            Line((51.886659205, 34.35618571), (50.557952936, 33.589056788))
            ThreePointArc((50.557952936, 33.589056788), (49.163396147, 28.3845), (54.367952936, 26.989943212))
        make_face()
        with Locations(Location((52.462952936, 30.2895, 0), (0, 0, 270))):
            Circle(SKETCH18_R, mode=Mode.SUBTRACT)
    # profile 6 of 6: a face of its own
    with BuildSketch(Plane.XZ):
        with BuildLine():
            Line((50.557952936, -33.589056788), (51.886659205, -34.35618571))
            ThreePointArc((51.886659205, -34.35618571), (53.892760878, -31.115), (55.696659205, -27.757072134))
            Line((55.696659205, -27.757072134), (54.367952936, -26.989943212))
            ThreePointArc((54.367952936, -26.989943212), (49.163396147, -28.3845), (50.557952936, -33.589056788))
        make_face()
        with Locations(Location((52.462952936, -30.2895, 0), (0, 0, 270))):
            Circle(SKETCH18_R, mode=Mode.SUBTRACT)
    extrude(amount=BOSS_EXTRUDE20_DEPTH)

    # Sketch19 → Cut-Extrude4 (cut, symmetric)
    with BuildSketch(Plane.XY.offset(-62.113257844)):
        with Locations((0, -10.541)):
            Rectangle(SKETCH19_W, SKETCH19_H)
    cut_extrude4 = extrude(amount=CUT_EXTRUDE4_DEPTH, both=True, mode=Mode.SUBTRACT)

    # CirPattern1: Cut-Extrude4 ×6 about axis
    cirpattern1_axis = Axis((0, 0, 0), (0, 1, 0))
    for i in range(1, CIRPATTERN1_COUNT):
        add(cut_extrude4.rotate(cirpattern1_axis, i * 360 / CIRPATTERN1_COUNT), mode=Mode.SUBTRACT)

    # Sketch21 → Cut-Extrude6 (cut)
    with BuildSketch(Plane.XZ):
        with Locations(Location((15.494, -71.12, 0), (0, 0, 270))):
            Circle(SKETCH21_R)
        with Locations(Location((-15.494, -71.12, 0), (0, 0, 270))):
            Circle(SKETCH21_R)
    extrude(amount=-CUT_EXTRUDE6_DEPTH, mode=Mode.SUBTRACT)

    # Fillet2
    # the kernel refuses this fillet: 68.58 mm, written as the material it adds along each edge
    with BuildSketch(Plane(origin=(20.32, 0, -73.440708058), x_dir=(0.8941931213145367, 0, 0.4476814289132022), z_dir=(0, 1, 0))) as fillet2_piece_1:
        with BuildLine():
            CenterArc((42.653307006, 67.290356345), FILLET2_R, 212.089221398, 46.781764691)
            Line((-15.449169128, 30.857971476), (-16.61121865, 30.129323779))
            ThreePointArc((-16.61121865, 30.129323779), (-8.951059849, 14.81494589), (-1.226475285, -0.614039848))
            Line((-1.226475285, -0.614039848), (0.264744664, -1.345807127))
            ThreePointArc((0.264744664, -1.345807127), (14.708036899, 0.061337395), (29.151329133, -1.345807127))
            Line((29.151329133, -1.345807127), (29.416073797, 0))
        make_face()
    extrude(amount=5.08)
    with BuildSketch(Plane(origin=(-20.32, 0, -73.440708058), x_dir=(0, 0, -1), z_dir=(0, 1, 0))) as fillet2_piece_2:
        with BuildLine():
            CenterArc((41.075480346, 68.264936606), FILLET2_R, 217.724037777, 46.781764691)
            Line((-13.16902995, 26.303650845), (-14.253920156, 25.46442513))
            ThreePointArc((-14.253920156, 25.46442513), (-6.529667499, 13.179285035), (-1.321932745, -0.36576))
            Line((-1.321932745, -0.36576), (0, -1.3716))
            ThreePointArc((0, -1.3716), (17.254645971, -1.3716), (34.377968174, -1.365298732))
            Line((34.377968174, -1.365298732), (34.509291942, 0))
        make_face()
    extrude(amount=5.08)


solid = part.part
